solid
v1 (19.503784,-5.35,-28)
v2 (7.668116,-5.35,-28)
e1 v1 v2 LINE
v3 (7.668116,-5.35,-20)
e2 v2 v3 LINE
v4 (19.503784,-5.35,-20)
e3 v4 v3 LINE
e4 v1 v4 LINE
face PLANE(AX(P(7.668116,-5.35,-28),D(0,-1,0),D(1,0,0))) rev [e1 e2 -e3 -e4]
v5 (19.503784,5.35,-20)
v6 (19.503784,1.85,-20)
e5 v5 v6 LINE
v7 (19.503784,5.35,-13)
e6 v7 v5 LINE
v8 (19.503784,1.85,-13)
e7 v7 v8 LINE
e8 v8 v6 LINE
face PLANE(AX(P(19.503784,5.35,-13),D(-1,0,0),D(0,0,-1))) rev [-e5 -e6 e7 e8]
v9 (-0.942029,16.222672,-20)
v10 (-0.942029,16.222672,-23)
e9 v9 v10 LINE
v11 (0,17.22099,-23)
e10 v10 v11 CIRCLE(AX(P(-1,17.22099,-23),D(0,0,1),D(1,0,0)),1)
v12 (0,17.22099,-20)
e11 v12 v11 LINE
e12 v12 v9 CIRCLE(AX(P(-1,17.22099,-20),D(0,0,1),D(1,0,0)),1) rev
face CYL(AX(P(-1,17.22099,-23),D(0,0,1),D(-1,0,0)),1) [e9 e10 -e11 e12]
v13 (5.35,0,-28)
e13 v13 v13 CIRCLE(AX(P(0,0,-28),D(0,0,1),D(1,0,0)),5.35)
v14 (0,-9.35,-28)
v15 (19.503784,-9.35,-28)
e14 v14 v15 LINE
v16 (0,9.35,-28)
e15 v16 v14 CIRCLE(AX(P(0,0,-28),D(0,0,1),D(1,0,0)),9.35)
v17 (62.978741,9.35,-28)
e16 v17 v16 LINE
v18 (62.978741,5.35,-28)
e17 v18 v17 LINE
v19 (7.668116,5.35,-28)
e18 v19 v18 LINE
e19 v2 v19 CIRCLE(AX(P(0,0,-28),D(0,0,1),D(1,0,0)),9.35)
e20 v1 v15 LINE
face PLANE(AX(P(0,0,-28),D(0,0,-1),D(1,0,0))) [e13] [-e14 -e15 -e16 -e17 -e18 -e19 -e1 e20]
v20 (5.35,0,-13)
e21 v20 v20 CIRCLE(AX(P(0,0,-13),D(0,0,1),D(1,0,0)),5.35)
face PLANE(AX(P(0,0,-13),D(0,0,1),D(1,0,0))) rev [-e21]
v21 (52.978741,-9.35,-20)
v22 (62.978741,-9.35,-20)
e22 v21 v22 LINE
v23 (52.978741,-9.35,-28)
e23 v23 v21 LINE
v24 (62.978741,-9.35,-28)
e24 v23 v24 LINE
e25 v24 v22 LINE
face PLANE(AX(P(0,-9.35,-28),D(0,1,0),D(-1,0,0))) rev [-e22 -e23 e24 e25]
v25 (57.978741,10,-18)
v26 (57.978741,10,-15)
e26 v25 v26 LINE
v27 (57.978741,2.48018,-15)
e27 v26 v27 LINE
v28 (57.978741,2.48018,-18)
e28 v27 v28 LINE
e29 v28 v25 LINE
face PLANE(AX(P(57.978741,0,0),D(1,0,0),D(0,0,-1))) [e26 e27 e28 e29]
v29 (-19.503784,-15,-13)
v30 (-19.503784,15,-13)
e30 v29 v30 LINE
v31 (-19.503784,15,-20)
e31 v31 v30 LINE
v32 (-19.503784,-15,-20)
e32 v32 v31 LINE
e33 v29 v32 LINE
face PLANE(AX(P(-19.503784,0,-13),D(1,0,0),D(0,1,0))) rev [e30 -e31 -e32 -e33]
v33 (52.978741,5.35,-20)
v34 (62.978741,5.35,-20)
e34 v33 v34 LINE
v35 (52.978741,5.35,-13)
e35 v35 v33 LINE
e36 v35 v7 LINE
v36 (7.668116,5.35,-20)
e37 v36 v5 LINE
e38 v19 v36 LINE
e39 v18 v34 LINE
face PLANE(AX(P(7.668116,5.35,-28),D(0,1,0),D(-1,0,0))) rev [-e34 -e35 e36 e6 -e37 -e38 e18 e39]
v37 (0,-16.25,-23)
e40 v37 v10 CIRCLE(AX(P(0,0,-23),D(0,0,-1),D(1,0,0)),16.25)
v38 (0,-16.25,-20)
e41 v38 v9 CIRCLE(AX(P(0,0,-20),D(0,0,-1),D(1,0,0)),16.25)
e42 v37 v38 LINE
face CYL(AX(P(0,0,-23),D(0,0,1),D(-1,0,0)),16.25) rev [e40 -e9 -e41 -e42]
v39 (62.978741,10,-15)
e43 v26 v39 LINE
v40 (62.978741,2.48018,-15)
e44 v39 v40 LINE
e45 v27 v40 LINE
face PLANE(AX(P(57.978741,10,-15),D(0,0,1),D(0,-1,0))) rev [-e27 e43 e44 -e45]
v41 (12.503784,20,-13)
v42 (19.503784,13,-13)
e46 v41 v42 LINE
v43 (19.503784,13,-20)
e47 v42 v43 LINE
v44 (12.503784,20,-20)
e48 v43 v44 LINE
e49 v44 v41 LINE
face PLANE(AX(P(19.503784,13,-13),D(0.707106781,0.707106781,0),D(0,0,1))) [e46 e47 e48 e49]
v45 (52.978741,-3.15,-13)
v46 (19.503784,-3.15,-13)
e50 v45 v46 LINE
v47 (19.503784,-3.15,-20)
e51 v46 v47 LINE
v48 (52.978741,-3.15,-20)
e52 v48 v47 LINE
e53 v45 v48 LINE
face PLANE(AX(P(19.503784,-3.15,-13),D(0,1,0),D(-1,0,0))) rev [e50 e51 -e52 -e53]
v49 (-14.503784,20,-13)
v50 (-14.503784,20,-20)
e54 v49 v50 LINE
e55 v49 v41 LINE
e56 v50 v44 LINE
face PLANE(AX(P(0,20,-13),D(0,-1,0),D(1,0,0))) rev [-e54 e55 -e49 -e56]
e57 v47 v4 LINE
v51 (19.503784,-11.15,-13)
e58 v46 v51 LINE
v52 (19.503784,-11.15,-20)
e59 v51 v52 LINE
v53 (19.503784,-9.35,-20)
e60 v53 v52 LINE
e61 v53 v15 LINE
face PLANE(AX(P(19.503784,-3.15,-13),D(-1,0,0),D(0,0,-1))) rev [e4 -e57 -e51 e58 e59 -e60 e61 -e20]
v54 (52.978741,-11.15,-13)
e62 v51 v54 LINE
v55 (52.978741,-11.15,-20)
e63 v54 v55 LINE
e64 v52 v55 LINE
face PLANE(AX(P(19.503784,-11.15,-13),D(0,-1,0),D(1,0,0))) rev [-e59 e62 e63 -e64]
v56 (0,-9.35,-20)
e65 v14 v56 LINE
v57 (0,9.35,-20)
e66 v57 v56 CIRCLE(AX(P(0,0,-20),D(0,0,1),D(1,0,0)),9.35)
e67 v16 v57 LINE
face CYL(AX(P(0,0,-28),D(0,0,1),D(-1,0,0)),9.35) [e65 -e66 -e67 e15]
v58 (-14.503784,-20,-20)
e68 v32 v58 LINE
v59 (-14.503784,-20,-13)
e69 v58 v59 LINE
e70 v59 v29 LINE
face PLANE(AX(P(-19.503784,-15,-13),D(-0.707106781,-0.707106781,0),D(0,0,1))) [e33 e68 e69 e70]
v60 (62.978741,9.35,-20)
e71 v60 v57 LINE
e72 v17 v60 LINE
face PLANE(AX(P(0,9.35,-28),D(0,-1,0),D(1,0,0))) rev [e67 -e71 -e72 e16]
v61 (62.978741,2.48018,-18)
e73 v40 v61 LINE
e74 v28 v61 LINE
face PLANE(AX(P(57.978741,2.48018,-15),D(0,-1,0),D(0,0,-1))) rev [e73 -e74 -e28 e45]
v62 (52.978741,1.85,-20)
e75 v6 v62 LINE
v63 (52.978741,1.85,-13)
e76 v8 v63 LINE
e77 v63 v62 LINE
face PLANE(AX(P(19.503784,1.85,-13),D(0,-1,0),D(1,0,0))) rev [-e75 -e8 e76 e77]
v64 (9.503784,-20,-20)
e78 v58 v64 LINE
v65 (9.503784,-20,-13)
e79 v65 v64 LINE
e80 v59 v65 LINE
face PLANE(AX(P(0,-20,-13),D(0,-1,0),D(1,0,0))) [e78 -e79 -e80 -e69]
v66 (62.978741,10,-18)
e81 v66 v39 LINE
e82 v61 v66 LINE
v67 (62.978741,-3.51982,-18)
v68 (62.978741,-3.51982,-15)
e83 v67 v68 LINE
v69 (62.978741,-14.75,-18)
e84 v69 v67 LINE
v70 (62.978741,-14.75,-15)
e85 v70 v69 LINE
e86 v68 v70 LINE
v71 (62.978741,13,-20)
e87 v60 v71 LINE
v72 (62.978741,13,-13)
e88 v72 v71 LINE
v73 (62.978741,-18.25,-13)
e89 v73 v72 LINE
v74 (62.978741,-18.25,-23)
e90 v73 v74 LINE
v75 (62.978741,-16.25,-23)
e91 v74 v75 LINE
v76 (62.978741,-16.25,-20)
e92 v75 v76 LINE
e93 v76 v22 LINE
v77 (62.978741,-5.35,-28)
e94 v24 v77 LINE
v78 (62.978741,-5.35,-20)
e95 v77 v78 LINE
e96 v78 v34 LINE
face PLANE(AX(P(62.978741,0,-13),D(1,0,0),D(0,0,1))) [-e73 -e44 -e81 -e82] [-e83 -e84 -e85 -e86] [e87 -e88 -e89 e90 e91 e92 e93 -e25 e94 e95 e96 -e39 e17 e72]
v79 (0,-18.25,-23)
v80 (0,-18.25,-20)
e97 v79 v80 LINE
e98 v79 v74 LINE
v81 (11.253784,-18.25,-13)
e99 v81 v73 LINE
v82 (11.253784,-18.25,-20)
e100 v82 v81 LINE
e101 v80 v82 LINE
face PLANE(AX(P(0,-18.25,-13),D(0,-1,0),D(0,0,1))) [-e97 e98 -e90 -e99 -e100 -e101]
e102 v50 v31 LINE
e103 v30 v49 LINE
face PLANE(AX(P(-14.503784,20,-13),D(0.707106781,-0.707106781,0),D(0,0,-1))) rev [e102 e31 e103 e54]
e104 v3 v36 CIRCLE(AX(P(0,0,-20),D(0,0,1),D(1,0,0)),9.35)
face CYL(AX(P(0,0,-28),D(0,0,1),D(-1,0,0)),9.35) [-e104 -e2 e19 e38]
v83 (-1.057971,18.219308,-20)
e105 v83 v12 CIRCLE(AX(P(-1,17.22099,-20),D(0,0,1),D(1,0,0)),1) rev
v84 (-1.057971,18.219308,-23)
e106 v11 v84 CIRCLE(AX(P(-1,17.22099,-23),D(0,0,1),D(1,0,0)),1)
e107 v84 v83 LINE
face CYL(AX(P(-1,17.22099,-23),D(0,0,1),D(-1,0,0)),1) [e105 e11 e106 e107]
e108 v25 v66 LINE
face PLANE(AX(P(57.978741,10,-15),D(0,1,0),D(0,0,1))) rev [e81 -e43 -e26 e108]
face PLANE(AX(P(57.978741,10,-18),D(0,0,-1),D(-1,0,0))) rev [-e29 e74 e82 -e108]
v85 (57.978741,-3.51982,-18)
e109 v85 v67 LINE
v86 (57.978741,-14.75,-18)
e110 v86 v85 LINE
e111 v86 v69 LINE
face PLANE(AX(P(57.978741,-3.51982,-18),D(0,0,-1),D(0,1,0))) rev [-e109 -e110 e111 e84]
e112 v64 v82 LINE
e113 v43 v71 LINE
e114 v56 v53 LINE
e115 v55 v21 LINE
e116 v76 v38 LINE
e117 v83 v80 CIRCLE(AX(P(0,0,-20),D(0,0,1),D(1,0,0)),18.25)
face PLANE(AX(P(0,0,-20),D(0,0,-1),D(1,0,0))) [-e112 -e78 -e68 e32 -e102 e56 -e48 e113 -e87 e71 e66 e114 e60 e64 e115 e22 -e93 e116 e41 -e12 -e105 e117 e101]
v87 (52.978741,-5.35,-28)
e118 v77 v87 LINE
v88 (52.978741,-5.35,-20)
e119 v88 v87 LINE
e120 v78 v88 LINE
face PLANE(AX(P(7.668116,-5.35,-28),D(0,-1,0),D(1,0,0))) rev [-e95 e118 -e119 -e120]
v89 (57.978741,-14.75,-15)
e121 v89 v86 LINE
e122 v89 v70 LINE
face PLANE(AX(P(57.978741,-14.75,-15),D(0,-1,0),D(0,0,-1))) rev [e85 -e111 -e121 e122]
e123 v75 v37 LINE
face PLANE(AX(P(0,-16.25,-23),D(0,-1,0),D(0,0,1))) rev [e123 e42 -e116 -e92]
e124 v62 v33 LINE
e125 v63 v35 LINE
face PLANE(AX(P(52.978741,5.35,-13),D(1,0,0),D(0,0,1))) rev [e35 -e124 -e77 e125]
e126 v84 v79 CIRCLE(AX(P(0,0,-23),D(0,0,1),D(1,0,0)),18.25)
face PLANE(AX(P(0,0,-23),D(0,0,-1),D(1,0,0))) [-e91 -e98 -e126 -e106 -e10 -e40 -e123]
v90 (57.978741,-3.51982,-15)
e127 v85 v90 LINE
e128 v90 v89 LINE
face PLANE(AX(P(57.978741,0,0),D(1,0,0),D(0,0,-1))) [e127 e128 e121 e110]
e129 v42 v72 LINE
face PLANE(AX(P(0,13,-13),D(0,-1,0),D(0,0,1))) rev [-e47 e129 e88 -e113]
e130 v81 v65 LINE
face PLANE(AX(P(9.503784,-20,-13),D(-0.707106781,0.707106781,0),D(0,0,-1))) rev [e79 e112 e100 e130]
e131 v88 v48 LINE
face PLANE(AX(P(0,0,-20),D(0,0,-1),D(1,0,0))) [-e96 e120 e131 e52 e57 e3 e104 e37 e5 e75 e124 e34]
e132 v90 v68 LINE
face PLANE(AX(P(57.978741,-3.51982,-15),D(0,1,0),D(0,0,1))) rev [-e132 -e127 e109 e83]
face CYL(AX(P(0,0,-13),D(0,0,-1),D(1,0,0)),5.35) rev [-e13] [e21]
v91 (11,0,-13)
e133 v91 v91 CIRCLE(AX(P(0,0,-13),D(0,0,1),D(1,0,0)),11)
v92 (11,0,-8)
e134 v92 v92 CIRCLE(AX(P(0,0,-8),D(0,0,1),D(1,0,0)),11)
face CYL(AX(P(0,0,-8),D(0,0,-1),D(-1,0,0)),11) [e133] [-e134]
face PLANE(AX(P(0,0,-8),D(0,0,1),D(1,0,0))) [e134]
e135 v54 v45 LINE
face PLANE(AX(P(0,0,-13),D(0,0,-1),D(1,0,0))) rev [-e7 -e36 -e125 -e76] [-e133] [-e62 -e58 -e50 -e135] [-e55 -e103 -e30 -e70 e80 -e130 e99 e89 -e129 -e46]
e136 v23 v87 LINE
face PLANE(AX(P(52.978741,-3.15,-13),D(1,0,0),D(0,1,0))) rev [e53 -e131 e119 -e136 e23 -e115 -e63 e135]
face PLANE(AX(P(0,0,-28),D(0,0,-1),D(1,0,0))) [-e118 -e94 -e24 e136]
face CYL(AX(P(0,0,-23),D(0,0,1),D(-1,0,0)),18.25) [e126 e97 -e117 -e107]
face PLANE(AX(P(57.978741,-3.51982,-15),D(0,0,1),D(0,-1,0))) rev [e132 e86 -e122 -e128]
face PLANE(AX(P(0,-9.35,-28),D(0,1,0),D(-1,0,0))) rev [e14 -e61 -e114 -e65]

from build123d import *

# Parameters (mm, degrees)
SKETCH1_R               = 5.35
BOSS_EXTRUDE2_DEPTH     = 7
BOSS_EXTRUDE3_START     = 8
SKETCH3_R               = 5.35
BOSS_EXTRUDE3_DEPTH     = 8
BOSS_EXTRUDE4_DEPTH     = 3
FILLET1_R               = 1
CHAMFER1_SIZE           = 10
CHAMFER2_SIZE           = 5
CUT_EXTRUDE1_DEPTH      = 67.560662475
CUT_EXTRUDE1_DEPTH_BACK = 67.560662475
SKETCH5_W               = 33.474956737
SKETCH5_H               = 3.5
SKETCH5_H_2             = 8
CHAMFER3_SIZE           = 7
SKETCH6_R               = 11
BOSS_EXTRUDE5_DEPTH     = 5
SKETCH8_W               = 3
SKETCH8_H               = 7.519820499
SKETCH8_H_2             = 11.230179501
CUT_EXTRUDE2_DEPTH      = 5


# Some blends are built 0.0001 mm under size
with BuildPart() as part:
    # Sketch1 → Boss-Extrude2 (new body)
    with BuildSketch(Plane.XY):
        Polygon((-19.503784034, -20), (19.503784034, -20), (19.503784034, -18.25), (62.978740771, -18.25), (62.978740771, 13), (19.503784034, 13), (19.503784034, 20), (-19.503784034, 20), align=None)
        Circle(SKETCH1_R, mode=Mode.SUBTRACT)
    extrude(amount=-BOSS_EXTRUDE2_DEPTH)

    # Sketch3 → Boss-Extrude3 (add)
    with BuildSketch(Plane.XY.offset(BOSS_EXTRUDE3_START)):
        with BuildLine():
            Line((7.668115805, 5.35), (62.978740771, 5.35))
            Line((62.978740771, 5.35), (62.978740771, 9.35))
            Line((62.978740771, 9.35), (0, 9.35))
            ThreePointArc((0, 9.35), (-9.35, 0), (0, -9.35))
            Line((0, -9.35), (62.978740771, -9.35))
            Line((62.978740771, -9.35), (62.978740771, -5.35))
            Line((62.978740771, -5.35), (7.668115805, -5.35))
            ThreePointArc((7.668115805, -5.35), (9.35, 0), (7.668115805, 5.35))
        make_face()
        Circle(SKETCH3_R, mode=Mode.SUBTRACT)
    extrude(amount=-BOSS_EXTRUDE3_DEPTH)

    # Sketch4 → Boss-Extrude4 (add)
    with BuildSketch(Plane.XY):
        with BuildLine():
            Line((0, -18.25), (62.978740771, -18.25))
            Line((62.978740771, -18.25), (62.978740771, -16.25))
            Line((62.978740771, -16.25), (8.306623863, -16.25))
            Line((8.306623863, -16.25), (0, -16.25))
            ThreePointArc((0, -16.25), (-16.25, 0), (0, 16.25))
            Line((0, 16.25), (0, 18.25))
            ThreePointArc((0, 18.25), (-18.25, 0), (0, -18.25))
        make_face()
    extrude(amount=BOSS_EXTRUDE4_DEPTH)

    # Fillet1
    fillet1_edges = [part.edges().sort_by_distance(p)[0] for p in [
        (0, 16.25, 1.5),
        (0, 18.25, 1.5),
    ]]
    fillet(fillet1_edges, radius=FILLET1_R - 0.0001)  # a hair under: the kernel refuses the full size

    # Chamfer1
    # the kernel refuses this chamfer: 10 mm, written as the material it takes off along each edge
    with BuildSketch(Plane(origin=(19.503784034, -20, 25.71682988), x_dir=(0.027495876610586317, 0.9996219169112968, 0), z_dir=(0, 0, -1))) as chamfer1_piece_1_section:
        Polygon((CHAMFER1_SIZE * 0.999621916911, -CHAMFER1_SIZE * 0.0274958766106), (-CHAMFER1_SIZE * 0.0274958766106, -CHAMFER1_SIZE * 0.999621916911), (0, 0), align=None)
    chamfer1_piece_1 = extrude(amount=58.433659759, mode=Mode.PRIVATE)
    chamfer1_piece_1 = split(chamfer1_piece_1, bisect_by=Plane(origin=(14.814200223, -18.25, -3.5), z_dir=(0, -1, 0)), keep=Keep.TOP, mode=Mode.PRIVATE)
    add(chamfer1_piece_1, mode=Mode.SUBTRACT)

    # Chamfer2
    chamfer2_edges = [part.edges().sort_by_distance(p)[0] for p in [
        (-19.503784034, -20, -3.5),
        (-19.503784034, 20, -3.5),
    ]]
    chamfer(chamfer2_edges, length=CHAMFER2_SIZE)

    # Sketch5 → Cut-Extrude1 (cut, two sides: drawn at the far end of the back side and taken through both)
    with BuildSketch(Plane.XY.offset(-CUT_EXTRUDE1_DEPTH_BACK)):
        with Locations((36.241262403, 3.6)):
            Rectangle(SKETCH5_W, SKETCH5_H)
        with Locations((36.241262403, -7.15)):
            Rectangle(SKETCH5_W, SKETCH5_H_2)
    extrude(amount=CUT_EXTRUDE1_DEPTH + CUT_EXTRUDE1_DEPTH_BACK, mode=Mode.SUBTRACT)

    # Chamfer3
    chamfer3_edges = [part.edges().sort_by_distance(p)[0] for p in [
        (19.503784034, 20, -3.5),
    ]]
    chamfer(chamfer3_edges, length=CHAMFER3_SIZE - 0.0001)  # a hair under: the kernel refuses the full size


with BuildPart() as body_2:
    # Mirror9: mirrored copy
    add(part.part.mirror(Plane.XY.offset(-10)))

    # Sketch6 → Boss-Extrude5 (add)
    with BuildSketch(Plane.XY.offset(-13)):
        Circle(SKETCH6_R)
    extrude(amount=BOSS_EXTRUDE5_DEPTH)

    # Sketch8 → Cut-Extrude2 (cut)
    with BuildSketch(Plane(origin=(62.978740771, 0, 0), x_dir=(0, 0, -1), z_dir=(1, 0, 0))):
        with Locations((16.5, 6.240089751)):
            Rectangle(SKETCH8_W, SKETCH8_H)
        with Locations((16.5, -9.13491025)):
            Rectangle(SKETCH8_W, SKETCH8_H_2)
    extrude(amount=-CUT_EXTRUDE2_DEPTH, mode=Mode.SUBTRACT)


solid = body_2.part
